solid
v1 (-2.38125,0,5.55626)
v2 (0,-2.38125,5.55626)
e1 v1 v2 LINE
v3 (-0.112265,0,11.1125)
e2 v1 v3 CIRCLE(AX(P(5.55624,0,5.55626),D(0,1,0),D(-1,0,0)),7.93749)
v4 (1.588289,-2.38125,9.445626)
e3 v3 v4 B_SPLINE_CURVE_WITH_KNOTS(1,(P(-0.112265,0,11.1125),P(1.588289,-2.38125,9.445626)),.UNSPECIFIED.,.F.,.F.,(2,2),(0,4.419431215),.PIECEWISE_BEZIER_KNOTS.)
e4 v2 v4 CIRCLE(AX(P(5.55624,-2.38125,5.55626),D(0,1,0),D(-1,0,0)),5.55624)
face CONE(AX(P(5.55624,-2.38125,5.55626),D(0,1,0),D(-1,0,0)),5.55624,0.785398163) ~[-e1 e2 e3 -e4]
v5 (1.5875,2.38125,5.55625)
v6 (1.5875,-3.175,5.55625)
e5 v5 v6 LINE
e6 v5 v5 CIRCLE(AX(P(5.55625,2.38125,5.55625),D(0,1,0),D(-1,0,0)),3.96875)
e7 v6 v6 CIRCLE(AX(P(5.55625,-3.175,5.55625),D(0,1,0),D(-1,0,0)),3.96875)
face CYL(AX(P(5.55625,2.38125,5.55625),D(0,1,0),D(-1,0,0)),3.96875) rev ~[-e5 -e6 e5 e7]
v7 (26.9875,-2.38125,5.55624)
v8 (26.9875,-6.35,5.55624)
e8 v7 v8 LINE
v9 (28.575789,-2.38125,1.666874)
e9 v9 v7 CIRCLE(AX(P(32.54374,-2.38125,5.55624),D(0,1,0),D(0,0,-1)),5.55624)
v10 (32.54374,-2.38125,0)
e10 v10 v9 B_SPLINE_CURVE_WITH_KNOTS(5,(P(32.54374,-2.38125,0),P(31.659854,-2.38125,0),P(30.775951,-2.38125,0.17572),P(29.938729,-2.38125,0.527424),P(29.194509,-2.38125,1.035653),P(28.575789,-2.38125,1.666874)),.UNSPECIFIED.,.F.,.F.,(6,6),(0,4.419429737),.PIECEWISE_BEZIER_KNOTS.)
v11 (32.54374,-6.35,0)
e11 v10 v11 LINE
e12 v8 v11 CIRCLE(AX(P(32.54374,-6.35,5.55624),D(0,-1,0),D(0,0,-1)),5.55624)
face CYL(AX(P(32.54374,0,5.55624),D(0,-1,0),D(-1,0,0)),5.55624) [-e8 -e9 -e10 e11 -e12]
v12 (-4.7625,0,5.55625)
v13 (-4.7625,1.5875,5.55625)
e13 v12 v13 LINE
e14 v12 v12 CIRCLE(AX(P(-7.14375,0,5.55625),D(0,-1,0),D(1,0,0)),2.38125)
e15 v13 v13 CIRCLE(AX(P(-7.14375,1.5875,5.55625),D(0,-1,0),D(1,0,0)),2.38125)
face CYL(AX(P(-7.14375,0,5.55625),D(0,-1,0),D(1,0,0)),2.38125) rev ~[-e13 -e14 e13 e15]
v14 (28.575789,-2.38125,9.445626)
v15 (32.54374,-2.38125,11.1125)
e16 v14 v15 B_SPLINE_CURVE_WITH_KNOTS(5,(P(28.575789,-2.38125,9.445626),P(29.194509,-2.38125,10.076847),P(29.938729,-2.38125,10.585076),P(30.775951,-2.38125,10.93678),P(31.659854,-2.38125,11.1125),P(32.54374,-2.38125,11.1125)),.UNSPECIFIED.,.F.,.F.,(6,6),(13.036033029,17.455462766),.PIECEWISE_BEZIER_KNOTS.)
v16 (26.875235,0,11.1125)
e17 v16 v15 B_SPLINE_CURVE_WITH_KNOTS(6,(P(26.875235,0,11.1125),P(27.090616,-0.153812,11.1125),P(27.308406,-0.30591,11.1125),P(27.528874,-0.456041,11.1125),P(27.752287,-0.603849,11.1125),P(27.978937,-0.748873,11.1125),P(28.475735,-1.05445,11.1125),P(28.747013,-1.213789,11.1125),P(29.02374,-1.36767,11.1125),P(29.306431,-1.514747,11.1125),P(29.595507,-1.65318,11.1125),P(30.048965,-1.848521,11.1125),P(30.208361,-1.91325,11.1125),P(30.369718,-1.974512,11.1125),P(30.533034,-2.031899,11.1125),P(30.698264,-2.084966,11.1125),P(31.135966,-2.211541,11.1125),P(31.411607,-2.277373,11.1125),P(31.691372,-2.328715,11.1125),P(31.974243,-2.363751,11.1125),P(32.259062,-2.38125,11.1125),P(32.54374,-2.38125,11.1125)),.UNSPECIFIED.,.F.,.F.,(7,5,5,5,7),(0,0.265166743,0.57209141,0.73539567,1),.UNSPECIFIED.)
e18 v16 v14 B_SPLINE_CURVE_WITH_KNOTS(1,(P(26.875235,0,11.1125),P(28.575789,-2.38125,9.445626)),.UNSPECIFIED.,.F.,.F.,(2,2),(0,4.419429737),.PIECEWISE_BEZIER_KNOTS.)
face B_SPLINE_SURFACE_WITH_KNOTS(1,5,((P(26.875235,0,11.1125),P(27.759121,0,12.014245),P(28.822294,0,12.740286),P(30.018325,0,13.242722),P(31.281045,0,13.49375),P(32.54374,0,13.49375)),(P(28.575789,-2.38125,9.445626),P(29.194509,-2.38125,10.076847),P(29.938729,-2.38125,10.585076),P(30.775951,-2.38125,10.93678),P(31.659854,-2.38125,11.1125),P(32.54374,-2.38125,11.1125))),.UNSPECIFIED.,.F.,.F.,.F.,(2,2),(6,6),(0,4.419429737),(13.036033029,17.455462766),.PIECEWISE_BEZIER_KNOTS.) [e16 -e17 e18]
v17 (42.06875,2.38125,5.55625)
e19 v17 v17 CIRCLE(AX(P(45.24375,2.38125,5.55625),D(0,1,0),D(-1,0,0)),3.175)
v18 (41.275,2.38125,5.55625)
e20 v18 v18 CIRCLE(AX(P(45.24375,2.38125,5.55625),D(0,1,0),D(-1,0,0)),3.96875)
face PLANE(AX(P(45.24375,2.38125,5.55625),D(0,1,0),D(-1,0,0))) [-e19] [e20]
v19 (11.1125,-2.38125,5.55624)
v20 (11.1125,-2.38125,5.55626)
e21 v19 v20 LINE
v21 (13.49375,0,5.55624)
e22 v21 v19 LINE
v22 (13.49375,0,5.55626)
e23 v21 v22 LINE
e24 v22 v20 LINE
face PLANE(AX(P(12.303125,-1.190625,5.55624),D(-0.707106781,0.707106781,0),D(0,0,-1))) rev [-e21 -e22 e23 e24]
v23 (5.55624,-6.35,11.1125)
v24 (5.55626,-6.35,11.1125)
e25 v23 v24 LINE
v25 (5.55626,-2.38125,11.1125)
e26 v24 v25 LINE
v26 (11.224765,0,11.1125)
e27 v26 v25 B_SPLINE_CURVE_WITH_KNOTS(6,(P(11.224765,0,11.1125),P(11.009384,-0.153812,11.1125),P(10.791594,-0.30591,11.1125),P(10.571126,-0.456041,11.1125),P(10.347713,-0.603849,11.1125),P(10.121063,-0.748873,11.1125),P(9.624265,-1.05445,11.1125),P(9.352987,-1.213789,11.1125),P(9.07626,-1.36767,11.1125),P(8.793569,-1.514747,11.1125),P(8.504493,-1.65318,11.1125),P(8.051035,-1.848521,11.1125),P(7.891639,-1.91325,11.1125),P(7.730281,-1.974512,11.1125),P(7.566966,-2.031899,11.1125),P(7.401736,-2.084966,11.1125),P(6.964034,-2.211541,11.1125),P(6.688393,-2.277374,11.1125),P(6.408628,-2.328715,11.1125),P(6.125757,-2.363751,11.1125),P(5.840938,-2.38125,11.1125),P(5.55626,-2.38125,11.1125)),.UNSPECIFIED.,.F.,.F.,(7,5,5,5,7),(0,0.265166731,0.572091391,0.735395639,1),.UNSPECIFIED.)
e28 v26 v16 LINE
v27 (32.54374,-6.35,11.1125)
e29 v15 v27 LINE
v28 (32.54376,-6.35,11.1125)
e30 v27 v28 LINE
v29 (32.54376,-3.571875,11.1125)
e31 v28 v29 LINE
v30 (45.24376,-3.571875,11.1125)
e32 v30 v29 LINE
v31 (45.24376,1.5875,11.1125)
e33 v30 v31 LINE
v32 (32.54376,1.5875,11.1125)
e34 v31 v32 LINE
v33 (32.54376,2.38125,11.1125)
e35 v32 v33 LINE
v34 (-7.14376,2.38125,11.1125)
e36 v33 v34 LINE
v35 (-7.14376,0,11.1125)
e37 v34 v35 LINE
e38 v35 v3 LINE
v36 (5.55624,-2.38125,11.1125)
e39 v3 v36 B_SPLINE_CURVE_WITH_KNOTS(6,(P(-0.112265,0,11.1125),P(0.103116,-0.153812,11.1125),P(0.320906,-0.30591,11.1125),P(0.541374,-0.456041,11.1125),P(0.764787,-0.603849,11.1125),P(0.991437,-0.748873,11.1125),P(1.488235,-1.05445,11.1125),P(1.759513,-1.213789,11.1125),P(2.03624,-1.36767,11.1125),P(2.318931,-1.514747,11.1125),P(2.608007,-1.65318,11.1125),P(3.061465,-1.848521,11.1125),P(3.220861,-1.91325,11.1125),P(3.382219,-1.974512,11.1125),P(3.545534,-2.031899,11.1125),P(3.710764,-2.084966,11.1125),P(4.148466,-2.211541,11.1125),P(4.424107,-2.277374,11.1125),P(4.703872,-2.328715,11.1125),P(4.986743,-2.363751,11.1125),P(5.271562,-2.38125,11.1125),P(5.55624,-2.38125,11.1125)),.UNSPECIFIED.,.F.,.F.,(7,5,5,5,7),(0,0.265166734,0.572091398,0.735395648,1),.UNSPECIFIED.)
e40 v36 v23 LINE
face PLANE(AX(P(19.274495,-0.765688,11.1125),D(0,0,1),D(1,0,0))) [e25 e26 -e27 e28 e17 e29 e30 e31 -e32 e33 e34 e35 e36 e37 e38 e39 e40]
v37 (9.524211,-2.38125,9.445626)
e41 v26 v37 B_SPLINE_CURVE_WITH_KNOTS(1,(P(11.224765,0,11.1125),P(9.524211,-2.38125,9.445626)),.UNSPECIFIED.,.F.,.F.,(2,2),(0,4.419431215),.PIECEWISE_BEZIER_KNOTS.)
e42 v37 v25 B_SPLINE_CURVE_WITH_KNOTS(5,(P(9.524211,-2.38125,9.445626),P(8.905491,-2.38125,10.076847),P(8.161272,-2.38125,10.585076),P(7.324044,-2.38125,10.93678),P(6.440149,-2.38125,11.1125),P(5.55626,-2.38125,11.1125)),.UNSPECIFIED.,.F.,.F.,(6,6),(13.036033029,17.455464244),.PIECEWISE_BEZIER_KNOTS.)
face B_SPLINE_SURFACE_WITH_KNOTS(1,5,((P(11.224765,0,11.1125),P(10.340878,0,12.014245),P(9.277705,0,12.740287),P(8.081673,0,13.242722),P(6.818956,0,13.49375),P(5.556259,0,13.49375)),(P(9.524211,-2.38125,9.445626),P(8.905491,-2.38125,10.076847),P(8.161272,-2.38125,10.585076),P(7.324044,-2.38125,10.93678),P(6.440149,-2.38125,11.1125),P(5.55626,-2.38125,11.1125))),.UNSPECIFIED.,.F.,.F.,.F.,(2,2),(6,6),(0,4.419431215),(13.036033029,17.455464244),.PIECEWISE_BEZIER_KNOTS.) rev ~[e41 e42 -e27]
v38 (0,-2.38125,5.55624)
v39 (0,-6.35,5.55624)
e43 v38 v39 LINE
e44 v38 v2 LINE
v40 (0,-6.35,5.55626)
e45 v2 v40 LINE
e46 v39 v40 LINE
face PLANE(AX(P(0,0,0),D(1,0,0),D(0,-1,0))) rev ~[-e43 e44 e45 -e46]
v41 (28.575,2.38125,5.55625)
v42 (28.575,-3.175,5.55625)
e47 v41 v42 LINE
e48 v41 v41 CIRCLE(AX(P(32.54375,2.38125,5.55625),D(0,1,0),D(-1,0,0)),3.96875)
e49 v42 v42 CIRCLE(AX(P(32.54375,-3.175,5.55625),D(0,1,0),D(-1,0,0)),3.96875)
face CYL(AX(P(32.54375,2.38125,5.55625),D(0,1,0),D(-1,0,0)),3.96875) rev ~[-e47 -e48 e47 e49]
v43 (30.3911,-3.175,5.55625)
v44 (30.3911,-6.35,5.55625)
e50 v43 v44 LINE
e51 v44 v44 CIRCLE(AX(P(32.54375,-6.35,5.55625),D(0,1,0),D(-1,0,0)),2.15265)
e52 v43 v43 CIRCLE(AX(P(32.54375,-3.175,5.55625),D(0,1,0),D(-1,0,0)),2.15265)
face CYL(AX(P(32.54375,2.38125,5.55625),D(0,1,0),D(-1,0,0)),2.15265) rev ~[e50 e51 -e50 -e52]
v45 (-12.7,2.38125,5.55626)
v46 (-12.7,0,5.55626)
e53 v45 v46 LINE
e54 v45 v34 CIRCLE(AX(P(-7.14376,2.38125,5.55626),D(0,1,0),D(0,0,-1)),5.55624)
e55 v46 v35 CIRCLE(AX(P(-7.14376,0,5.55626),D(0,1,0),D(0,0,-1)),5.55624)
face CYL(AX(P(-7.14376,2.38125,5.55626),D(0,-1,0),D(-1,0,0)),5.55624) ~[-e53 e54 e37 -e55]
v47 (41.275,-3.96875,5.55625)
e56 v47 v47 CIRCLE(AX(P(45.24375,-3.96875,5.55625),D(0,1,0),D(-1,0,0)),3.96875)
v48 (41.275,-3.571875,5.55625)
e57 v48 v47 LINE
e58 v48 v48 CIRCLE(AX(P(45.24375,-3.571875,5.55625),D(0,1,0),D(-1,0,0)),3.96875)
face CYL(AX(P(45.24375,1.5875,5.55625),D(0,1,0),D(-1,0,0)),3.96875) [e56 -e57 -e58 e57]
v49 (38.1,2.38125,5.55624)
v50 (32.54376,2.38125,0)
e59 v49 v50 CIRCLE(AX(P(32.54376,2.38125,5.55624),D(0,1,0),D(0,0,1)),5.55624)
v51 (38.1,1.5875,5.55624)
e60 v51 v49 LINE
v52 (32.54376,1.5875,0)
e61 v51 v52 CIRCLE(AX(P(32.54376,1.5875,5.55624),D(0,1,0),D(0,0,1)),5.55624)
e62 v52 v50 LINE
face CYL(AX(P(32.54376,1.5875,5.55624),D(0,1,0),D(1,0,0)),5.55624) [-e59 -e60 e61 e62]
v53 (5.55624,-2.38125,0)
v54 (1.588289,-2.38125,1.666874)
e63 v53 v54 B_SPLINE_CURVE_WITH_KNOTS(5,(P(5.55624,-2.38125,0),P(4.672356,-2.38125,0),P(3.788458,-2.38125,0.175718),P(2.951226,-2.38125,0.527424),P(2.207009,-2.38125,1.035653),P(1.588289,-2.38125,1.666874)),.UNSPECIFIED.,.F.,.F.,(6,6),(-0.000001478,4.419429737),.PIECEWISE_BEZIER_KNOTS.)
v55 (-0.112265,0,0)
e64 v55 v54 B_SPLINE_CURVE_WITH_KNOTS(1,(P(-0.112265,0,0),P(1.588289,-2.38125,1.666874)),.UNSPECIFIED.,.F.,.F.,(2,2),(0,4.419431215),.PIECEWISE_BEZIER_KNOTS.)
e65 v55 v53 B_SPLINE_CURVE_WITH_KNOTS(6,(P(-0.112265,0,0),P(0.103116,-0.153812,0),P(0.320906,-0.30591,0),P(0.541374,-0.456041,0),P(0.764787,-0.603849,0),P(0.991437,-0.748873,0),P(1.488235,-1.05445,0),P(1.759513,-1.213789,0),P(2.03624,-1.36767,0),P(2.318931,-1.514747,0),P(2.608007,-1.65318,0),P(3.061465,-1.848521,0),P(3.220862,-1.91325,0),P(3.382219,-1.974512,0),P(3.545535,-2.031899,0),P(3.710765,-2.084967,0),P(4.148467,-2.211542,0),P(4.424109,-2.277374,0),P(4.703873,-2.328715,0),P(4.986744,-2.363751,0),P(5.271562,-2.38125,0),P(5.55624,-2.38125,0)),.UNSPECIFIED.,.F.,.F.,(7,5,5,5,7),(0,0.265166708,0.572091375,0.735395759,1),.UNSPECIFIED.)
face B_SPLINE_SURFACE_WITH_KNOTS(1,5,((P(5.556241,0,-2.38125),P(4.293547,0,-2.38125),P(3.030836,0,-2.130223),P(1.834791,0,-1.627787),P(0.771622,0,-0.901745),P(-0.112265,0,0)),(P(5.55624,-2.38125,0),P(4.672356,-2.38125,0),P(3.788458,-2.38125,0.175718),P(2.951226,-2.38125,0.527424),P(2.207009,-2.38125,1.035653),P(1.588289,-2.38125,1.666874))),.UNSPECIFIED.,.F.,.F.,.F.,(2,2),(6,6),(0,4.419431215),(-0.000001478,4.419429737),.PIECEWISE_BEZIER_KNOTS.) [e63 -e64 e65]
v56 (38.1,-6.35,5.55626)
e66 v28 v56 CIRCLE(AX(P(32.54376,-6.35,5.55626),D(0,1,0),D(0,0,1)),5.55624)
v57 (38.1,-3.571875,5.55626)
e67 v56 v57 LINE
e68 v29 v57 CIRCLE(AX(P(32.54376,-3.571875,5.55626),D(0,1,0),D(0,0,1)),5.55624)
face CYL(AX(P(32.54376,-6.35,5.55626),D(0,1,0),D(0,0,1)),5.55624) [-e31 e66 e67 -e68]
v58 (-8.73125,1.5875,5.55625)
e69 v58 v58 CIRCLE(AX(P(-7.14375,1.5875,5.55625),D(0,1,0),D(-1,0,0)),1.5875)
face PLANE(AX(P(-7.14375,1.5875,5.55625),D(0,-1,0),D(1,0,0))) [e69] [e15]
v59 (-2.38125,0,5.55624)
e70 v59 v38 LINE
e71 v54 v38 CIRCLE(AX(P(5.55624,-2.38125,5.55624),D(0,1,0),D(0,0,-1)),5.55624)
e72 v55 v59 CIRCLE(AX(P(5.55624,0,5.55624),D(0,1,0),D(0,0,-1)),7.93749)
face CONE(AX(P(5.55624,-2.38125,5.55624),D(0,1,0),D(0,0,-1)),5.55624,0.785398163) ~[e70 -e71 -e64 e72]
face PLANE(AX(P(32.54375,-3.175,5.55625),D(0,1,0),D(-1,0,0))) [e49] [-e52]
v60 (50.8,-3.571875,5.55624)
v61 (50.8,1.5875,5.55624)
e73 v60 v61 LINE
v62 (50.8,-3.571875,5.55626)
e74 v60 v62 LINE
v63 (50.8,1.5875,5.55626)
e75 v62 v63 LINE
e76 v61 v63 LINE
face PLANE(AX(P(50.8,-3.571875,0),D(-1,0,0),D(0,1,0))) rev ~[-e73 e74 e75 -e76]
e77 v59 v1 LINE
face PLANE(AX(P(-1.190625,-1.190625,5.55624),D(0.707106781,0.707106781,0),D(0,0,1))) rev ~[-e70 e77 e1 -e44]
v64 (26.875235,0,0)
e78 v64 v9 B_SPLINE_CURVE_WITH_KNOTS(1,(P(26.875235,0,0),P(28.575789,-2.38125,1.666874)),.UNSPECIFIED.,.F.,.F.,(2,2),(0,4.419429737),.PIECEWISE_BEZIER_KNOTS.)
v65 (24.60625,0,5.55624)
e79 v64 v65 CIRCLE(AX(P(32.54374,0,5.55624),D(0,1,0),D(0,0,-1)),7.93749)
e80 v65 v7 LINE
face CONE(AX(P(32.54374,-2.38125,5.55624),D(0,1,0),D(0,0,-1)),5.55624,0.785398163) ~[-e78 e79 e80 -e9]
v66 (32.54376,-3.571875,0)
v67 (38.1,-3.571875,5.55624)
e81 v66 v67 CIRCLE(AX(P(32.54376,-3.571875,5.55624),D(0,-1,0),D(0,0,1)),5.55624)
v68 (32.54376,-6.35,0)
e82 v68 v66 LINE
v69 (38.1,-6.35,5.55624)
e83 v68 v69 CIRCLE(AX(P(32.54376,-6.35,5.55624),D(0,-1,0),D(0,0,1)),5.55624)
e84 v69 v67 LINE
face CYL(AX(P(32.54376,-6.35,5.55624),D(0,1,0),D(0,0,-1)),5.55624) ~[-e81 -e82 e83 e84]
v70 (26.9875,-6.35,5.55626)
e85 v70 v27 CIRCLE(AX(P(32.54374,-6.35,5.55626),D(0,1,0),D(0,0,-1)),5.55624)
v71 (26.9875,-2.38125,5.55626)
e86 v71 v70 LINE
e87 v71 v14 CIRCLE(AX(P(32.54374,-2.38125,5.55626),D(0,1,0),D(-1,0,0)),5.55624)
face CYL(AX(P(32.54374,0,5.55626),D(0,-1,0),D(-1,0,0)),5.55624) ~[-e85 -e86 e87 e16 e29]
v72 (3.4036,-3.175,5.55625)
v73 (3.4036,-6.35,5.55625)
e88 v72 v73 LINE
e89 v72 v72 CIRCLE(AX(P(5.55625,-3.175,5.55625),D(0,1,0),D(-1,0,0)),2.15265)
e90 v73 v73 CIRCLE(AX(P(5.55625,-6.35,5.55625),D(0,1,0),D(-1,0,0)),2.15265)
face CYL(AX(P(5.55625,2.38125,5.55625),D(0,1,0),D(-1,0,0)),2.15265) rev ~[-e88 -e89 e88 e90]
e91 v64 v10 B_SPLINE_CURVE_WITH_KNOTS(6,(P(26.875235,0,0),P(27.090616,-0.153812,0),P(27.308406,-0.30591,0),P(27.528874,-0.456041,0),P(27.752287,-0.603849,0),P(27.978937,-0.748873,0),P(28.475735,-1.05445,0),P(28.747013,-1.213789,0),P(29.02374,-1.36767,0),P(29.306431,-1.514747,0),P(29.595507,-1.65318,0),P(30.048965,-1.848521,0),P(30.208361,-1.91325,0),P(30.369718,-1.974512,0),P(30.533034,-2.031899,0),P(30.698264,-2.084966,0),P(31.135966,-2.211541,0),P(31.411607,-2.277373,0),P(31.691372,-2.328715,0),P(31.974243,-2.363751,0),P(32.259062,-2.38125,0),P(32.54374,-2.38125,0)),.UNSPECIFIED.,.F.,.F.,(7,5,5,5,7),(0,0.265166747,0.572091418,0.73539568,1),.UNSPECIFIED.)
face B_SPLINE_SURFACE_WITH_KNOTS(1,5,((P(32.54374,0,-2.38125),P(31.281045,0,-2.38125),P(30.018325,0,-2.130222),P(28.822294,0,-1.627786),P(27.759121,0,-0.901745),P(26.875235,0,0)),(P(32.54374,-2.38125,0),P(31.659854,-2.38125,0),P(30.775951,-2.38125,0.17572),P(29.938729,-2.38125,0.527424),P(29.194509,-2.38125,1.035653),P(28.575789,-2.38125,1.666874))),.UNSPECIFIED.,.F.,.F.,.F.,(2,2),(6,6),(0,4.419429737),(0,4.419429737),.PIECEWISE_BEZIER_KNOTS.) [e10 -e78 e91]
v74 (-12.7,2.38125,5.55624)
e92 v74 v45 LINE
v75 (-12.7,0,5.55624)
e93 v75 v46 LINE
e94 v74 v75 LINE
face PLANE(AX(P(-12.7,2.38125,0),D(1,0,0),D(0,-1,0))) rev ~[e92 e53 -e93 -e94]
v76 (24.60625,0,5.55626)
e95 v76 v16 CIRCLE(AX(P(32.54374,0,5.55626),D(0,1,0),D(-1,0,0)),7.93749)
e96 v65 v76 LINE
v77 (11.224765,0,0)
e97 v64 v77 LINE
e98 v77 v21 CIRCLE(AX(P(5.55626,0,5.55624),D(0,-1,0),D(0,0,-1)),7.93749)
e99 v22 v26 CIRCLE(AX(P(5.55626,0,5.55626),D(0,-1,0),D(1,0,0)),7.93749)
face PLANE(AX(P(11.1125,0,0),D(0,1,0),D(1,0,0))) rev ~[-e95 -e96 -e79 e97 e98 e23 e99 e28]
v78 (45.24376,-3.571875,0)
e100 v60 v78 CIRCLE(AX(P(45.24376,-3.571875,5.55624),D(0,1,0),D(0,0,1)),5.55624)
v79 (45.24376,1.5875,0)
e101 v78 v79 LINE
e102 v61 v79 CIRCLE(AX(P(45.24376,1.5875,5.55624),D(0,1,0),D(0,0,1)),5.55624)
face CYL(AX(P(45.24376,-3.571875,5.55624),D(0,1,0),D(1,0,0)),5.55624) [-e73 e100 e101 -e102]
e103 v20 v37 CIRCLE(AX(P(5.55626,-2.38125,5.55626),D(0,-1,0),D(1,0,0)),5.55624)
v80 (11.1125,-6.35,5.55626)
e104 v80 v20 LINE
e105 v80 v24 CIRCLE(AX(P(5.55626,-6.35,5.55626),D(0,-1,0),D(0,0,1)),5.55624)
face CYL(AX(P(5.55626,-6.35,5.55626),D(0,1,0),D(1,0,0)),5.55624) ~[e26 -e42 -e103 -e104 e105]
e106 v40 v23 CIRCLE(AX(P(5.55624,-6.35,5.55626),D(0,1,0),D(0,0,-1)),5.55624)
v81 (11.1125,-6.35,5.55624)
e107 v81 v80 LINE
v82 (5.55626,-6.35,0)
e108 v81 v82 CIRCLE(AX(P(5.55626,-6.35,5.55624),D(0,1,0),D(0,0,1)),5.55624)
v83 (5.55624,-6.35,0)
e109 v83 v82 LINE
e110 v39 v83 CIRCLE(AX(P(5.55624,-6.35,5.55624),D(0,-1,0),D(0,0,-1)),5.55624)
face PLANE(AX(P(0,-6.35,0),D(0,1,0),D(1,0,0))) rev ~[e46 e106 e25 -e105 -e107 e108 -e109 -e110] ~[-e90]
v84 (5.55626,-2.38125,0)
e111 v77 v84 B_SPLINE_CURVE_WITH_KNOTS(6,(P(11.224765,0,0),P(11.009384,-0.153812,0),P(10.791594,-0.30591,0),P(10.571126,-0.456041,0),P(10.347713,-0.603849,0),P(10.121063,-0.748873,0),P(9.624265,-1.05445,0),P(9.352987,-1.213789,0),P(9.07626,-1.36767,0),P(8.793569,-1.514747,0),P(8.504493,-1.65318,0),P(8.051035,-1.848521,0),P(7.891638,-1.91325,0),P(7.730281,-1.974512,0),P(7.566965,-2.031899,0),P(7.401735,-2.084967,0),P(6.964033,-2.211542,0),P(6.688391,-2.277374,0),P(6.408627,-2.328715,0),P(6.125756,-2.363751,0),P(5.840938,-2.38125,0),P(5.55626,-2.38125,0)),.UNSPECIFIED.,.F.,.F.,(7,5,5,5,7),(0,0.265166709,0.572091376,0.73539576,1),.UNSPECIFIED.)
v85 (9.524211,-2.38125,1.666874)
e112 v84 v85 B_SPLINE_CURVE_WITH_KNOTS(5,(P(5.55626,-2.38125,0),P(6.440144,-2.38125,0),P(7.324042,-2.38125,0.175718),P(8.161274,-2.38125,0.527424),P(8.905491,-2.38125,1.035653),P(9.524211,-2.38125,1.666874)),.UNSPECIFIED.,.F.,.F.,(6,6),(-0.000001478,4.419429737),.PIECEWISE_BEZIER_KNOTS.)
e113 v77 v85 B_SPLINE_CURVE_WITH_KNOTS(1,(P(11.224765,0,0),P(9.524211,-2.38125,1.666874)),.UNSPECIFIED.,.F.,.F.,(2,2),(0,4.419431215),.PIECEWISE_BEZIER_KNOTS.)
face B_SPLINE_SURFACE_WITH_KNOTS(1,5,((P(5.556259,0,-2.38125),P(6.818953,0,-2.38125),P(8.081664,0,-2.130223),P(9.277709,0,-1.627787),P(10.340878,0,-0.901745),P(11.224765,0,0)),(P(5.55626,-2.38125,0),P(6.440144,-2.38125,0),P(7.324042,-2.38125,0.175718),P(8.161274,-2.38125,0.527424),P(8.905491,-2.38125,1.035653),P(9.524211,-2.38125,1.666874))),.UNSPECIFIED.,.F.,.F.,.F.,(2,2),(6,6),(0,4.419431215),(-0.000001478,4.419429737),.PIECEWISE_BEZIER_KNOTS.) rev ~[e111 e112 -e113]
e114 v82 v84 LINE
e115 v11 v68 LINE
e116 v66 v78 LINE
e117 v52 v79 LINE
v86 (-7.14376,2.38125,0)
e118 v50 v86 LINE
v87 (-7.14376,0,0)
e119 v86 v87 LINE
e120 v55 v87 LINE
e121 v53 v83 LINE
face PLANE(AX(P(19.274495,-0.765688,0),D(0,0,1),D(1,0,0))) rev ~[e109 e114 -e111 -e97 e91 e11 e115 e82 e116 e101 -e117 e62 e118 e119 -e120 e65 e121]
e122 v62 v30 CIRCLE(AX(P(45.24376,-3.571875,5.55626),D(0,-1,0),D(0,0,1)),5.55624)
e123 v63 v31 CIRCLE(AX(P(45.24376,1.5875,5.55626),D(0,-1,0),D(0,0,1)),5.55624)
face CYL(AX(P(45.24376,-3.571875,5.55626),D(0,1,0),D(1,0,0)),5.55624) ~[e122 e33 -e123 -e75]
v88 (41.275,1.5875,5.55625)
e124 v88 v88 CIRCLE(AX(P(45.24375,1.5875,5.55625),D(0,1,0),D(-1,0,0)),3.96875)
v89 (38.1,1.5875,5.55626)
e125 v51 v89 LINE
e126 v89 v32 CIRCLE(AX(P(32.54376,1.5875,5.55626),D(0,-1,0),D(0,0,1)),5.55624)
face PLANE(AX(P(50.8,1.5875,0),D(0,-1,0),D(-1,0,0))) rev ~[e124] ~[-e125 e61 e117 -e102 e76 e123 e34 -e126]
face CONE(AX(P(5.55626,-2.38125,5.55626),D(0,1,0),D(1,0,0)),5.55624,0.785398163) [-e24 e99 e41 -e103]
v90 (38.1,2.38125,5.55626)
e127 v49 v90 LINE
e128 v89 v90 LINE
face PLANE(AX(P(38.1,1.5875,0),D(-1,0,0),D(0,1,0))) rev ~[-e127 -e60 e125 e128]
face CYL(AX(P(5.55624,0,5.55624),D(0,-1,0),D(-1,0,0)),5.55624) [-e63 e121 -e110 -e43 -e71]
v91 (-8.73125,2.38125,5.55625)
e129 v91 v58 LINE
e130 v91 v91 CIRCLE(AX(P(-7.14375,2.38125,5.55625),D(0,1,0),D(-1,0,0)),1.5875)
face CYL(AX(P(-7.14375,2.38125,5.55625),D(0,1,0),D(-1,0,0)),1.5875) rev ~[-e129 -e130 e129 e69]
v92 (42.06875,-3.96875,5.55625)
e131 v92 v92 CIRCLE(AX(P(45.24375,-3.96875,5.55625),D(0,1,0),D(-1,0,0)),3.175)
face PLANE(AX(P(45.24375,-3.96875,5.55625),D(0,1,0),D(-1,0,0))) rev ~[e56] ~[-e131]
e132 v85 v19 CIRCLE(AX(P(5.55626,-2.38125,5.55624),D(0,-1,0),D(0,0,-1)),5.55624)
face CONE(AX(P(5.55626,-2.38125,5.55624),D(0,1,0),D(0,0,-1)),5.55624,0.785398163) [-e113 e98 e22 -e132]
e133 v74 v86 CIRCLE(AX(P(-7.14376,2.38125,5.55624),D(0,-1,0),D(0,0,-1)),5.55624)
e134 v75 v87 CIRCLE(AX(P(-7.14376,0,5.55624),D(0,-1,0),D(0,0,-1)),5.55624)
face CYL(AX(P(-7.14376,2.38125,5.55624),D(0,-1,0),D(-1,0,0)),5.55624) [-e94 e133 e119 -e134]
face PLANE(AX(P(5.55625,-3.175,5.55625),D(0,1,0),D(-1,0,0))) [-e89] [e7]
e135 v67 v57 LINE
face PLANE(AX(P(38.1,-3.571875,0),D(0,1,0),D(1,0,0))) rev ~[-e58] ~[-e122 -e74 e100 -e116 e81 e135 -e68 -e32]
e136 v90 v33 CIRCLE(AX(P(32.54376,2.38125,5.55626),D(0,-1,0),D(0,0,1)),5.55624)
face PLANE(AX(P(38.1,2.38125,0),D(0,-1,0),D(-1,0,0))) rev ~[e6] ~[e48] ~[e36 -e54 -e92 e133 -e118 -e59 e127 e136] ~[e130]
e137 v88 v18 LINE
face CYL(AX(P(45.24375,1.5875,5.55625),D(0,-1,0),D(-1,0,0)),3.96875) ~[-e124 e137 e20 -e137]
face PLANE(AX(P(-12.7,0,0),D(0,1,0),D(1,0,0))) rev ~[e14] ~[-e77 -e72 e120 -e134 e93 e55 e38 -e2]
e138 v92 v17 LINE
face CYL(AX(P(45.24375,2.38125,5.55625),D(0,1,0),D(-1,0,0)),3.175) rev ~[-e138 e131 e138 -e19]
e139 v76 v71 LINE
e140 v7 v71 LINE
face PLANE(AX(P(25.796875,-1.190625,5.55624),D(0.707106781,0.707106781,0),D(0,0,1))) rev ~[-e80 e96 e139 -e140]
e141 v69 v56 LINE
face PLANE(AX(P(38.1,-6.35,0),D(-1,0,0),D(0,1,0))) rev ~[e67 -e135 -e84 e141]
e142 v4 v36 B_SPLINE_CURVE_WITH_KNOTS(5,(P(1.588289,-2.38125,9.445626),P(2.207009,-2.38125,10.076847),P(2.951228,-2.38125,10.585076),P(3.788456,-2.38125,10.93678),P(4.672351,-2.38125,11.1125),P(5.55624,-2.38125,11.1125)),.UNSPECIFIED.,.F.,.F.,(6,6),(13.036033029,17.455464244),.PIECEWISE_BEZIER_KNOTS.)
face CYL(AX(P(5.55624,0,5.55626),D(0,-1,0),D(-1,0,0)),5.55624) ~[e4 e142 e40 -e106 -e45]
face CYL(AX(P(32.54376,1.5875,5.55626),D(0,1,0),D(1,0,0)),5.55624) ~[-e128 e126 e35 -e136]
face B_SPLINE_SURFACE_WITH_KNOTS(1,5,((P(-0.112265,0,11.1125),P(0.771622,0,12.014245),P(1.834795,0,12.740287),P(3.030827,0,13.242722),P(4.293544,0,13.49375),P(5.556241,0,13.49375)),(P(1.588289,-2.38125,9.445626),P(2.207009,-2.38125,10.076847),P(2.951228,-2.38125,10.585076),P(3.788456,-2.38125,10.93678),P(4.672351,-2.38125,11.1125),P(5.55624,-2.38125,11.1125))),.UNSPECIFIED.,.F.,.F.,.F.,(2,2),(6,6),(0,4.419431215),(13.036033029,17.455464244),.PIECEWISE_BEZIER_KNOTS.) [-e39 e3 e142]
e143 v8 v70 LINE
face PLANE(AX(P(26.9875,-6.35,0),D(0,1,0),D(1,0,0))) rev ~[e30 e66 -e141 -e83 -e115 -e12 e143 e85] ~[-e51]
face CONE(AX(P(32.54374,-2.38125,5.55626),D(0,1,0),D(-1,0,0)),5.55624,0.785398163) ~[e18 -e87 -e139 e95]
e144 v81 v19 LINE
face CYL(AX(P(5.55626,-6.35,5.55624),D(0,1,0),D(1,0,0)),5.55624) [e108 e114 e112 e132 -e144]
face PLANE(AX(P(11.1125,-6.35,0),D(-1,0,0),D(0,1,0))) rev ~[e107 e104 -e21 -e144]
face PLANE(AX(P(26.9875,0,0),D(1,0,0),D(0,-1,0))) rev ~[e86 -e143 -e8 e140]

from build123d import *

# Parameters (mm, degrees)
F1_DEPTH      = 11.1125
F2_R          = 3.175
F2_R_2        = 1.5875
F2_R_3        = 2.15265
F3_DEPTH      = 8.73125
F4_R          = 2.38125
F5_DEPTH      = 1.5875
F6_R          = 3.96875
F6_R_2        = 3.175
F7_DEPTH      = 0.79375
F7_DEPTH_BACK = 5.55625
F8_R          = 5.55624
F10_R         = 3.96875
F11_DEPTH     = 5.55625
F12_C1_SIZE   = 2.38125
F12_C2_SIZE   = 2.38125
F12_C3_SIZE   = 2.38125


# Not quite as in the source:
# - a fillet or chamfer is up to 0.001 mm smaller than in the source, because OpenCascade refuses the exact size


with BuildPart() as f1:
    # F0 (on Top) → F1 (new body)
    with BuildSketch(Plane.XY):
        Polygon((-12.7, 0), (0, 0), (0, -6.35), (11.1125, -6.35), (11.1125, 0), (26.9875, 0), (26.9875, -6.35), (38.1, -6.35), (38.1, -3.571875), (50.8, -3.571875), (50.8, 1.5875), (38.1, 1.5875), (38.1, 2.38125), (-12.7, 2.38125), align=None)
    extrude(amount=F1_DEPTH)

    # F2 (on face) → F3 (cut, through all)
    with BuildSketch(Plane(origin=(0, 2.38125, 0), x_dir=(-1, 0, 0), z_dir=(0, 1, 0))):
        with Locations((-45.24375, 5.55625)):
            Circle(F2_R)
        with Locations((7.14375, 5.55625)):
            Circle(F2_R_2)
        with Locations((-5.55625, 5.55625)):
            Circle(F2_R_3)
        with Locations((-32.54375, 5.55625)):
            Circle(F2_R_3)
    extrude(amount=-F3_DEPTH, mode=Mode.SUBTRACT)

    # F4 (on face) → F5 (cut)
    with BuildSketch(Plane.XZ):
        with Locations((-7.14375, 5.55625)):
            Circle(F4_R)
    extrude(amount=-F5_DEPTH, mode=Mode.SUBTRACT)

    # F6 (on face) → F7 (join, two sides)
    with BuildSketch(Plane(origin=(0, 1.5875, 0), x_dir=(-1, 0, 0), z_dir=(0, 1, 0))) as f7_sk:
        with Locations((-45.24375, 5.55625)):
            Circle(F6_R)
        with Locations((-45.24375, 5.55625)):
            Circle(F6_R_2, mode=Mode.SUBTRACT)
    extrude(amount=F7_DEPTH)
    extrude(f7_sk.sketch, amount=-F7_DEPTH_BACK)

    # F8 (radius 5.55625 in the source; OpenCascade refuses exactly that, so slightly less here)
    f8_edges = [f1.edges().sort_by_distance(p)[0] for p in [
        (0, -3.175, 0),
        (0, -3.175, 11.1125),
        (38.1, -4.960938, 0),
        (38.1, -4.960938, 11.1125),
        (38.1, 1.984375, 0),
        (38.1, 1.984375, 11.1125),
        (11.1125, -3.175, 11.1125),
        (11.1125, -3.175, 0),
        (26.9875, -3.175, 11.1125),
        (26.9875, -3.175, 0),
        (50.8, -0.992188, 11.1125),
        (50.8, -0.992188, 0),
        (-12.7, 1.190625, 11.1125),
        (-12.7, 1.190625, 0),
    ]]
    fillet(f8_edges, radius=F8_R)

    # F10 (on face) → F11 (cut, through all)
    with BuildSketch(Plane(origin=(0, 2.38125, 0), x_dir=(-1, 0, 0), z_dir=(0, 1, 0))):
        with Locations((-32.54375, 5.55625)):
            Circle(F10_R)
        with Locations((-5.55625, 5.55625)):
            Circle(F10_R)
    extrude(amount=-F11_DEPTH, mode=Mode.SUBTRACT)

    # F12: chamfer of 2.38125 on 5 edges, made by hand

    # F12_c1
    f12_c1_edges = [f1.edges().sort_by_distance(p)[0] for p in [
        (1.6273850181, 0, 9.4851149819),
        (0, 0, 5.55625),
        (1.6273850181, 0, 1.6273850181),
    ]]
    chamfer(f12_c1_edges, length=F12_C1_SIZE)

    # F12_c2
    f12_c2_edges = [f1.edges().sort_by_distance(p)[0] for p in [
        (28.6148850181, 0, 9.4851149819),
        (26.9875, 0, 5.55625),
        (28.6148850181, 0, 1.6273850181),
    ]]
    chamfer(f12_c2_edges, length=F12_C2_SIZE)

    # F12_c3
    f12_c3_edges = [f1.edges().sort_by_distance(p)[0] for p in [
        (11.1125, 0, 5.55625),
        (9.4851149819, 0, 9.4851149819),
        (9.4851149819, 0, 1.6273850181),
    ]]
    chamfer(f12_c3_edges, length=F12_C3_SIZE)


solid = f1.part
